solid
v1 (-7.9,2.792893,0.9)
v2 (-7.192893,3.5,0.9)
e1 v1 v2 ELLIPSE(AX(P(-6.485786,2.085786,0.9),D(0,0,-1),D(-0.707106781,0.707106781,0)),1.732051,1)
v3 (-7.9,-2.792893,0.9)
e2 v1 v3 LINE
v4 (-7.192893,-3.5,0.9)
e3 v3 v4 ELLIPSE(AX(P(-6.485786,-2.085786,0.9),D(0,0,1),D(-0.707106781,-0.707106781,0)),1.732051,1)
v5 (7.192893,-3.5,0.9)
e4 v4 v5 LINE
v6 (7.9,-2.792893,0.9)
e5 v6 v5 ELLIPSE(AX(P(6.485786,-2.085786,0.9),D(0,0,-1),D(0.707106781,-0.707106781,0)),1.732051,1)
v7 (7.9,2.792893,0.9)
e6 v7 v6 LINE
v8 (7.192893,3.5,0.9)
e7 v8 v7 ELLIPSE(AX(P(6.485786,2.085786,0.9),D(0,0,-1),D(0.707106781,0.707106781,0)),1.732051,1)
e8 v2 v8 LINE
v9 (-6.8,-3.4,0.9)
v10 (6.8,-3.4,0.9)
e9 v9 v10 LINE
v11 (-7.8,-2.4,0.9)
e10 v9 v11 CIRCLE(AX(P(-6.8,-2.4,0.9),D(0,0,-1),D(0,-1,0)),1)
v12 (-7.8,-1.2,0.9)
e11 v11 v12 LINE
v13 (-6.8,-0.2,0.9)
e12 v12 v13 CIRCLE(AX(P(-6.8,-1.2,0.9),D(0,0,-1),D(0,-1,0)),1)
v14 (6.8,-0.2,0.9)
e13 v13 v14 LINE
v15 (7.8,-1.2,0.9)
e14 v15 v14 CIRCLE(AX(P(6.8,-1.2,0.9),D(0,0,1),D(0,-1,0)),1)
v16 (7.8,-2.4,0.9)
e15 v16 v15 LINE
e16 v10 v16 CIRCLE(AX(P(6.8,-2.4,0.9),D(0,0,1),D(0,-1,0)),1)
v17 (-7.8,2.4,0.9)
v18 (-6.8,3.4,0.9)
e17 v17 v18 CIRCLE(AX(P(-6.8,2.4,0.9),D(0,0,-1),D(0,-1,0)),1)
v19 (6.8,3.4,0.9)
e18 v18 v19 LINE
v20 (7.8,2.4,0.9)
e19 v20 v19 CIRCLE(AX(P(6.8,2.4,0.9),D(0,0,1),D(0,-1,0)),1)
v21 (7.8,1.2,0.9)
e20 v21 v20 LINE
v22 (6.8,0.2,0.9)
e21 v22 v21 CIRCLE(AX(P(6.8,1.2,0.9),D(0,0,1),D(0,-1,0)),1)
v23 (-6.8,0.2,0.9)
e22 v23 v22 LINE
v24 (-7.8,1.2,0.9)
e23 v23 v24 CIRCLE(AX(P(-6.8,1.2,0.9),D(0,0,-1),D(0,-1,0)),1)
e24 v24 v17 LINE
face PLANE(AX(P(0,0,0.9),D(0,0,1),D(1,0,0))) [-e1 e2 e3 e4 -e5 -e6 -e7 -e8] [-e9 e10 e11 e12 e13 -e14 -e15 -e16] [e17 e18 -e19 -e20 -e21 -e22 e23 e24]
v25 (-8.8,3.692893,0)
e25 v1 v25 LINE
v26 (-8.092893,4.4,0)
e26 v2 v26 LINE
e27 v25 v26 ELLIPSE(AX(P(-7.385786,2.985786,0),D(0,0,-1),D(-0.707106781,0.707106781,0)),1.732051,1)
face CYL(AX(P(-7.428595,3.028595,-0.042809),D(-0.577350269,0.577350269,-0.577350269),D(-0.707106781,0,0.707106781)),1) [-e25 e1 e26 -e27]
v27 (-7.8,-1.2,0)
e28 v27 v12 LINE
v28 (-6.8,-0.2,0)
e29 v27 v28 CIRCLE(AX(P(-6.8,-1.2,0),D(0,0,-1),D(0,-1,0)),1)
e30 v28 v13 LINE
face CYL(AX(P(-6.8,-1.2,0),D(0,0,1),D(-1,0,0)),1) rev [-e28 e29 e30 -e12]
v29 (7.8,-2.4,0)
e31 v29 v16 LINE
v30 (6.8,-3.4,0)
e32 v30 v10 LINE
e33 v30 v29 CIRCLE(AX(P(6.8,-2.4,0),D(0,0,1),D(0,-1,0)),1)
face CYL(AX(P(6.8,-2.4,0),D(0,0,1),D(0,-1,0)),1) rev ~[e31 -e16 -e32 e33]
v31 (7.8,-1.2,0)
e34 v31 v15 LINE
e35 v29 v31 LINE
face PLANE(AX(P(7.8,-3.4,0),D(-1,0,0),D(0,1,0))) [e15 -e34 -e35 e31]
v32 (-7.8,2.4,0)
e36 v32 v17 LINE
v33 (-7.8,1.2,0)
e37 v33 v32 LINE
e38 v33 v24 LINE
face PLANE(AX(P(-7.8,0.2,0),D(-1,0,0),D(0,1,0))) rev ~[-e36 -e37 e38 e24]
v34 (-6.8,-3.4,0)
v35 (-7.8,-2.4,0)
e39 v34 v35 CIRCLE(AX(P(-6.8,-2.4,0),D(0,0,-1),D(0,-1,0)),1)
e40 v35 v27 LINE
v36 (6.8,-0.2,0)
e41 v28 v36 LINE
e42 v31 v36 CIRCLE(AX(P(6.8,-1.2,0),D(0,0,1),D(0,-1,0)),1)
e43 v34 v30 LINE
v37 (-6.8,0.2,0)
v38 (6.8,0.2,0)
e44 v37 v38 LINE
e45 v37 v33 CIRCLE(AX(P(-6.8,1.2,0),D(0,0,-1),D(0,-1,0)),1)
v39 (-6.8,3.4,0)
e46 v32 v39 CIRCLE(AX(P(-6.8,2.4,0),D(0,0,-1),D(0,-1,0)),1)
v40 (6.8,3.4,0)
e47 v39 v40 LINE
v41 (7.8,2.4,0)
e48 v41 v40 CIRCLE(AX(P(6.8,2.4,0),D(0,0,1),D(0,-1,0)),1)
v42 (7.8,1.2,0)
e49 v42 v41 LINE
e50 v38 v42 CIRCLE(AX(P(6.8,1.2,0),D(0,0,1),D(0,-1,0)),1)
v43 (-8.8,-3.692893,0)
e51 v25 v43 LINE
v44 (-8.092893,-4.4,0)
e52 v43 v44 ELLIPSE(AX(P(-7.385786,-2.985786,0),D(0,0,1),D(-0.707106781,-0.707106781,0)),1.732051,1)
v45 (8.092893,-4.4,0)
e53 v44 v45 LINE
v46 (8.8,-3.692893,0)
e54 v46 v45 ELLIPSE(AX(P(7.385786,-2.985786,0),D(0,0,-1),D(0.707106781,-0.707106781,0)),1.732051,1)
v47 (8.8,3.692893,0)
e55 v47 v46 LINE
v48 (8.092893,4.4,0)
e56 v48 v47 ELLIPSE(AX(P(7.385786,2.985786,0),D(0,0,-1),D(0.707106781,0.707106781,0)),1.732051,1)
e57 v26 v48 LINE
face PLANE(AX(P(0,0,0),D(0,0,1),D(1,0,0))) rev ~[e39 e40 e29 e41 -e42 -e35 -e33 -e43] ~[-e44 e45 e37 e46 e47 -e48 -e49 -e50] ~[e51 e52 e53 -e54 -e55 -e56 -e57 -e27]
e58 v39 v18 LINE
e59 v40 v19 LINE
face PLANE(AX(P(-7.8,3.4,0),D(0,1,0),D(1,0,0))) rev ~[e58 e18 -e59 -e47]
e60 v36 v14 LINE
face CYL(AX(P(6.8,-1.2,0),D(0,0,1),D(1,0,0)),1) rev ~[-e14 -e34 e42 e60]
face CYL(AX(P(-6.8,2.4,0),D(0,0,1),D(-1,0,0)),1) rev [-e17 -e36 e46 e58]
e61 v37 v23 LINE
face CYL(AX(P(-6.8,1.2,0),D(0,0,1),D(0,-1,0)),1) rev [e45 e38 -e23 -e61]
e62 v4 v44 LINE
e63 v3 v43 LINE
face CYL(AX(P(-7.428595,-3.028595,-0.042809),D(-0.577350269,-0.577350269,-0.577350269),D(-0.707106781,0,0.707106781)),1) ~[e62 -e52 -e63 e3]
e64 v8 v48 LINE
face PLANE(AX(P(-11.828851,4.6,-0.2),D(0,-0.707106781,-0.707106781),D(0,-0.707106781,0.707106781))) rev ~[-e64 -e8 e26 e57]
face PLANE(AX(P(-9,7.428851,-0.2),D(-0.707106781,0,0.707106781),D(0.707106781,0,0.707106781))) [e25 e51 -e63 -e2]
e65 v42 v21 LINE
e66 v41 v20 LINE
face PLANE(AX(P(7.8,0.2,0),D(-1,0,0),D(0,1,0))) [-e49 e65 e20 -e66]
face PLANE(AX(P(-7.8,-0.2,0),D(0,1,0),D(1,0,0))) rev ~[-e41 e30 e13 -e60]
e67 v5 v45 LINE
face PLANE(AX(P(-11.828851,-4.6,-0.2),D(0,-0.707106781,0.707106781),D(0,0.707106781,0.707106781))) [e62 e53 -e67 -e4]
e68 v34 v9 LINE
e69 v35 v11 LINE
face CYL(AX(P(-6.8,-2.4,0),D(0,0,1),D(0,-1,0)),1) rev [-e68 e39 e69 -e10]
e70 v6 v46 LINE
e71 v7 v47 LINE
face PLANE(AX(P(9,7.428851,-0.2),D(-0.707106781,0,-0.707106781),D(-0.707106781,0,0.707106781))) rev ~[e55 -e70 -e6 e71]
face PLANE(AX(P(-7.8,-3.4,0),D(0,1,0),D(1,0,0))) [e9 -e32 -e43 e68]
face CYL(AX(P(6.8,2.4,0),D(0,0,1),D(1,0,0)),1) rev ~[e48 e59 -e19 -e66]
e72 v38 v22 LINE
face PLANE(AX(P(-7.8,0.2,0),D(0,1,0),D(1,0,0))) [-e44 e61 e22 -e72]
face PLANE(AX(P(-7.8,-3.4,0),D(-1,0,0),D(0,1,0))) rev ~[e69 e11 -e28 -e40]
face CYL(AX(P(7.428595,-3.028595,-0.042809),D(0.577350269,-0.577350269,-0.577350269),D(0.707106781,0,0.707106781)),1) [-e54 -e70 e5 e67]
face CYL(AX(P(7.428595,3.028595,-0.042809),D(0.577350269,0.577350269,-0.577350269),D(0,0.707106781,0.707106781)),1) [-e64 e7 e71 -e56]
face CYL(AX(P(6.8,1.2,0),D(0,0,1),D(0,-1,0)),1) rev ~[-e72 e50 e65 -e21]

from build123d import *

# Parameters (mm, degrees)
F0_W        = 18
F0_H        = 9.2
F0_W_2      = 15.6
F0_H_2      = 3.2
F1_DEPTH    = 0.9
F2_T1_DEPTH = 23.6577025735
F2_T3_DEPTH = 14.8577025735
F3_R        = 1


# Not quite as in the source:
# - a fillet or chamfer that OpenCascade refuses, or shapes differently, is made with other operations: its cross-section is extruded or revolved along the edge and cut away or added


with BuildPart() as f1:
    # F0 (on Top) → F1 (new body)
    with BuildSketch(Plane.XY):
        Rectangle(F0_W, F0_H)
        with Locations((0, -1.8)):
            Rectangle(F0_W_2, F0_H_2, mode=Mode.SUBTRACT)
        with Locations((0, 1.8)):
            Rectangle(F0_W_2, F0_H_2, mode=Mode.SUBTRACT)
    extrude(amount=F1_DEPTH)

    # F2: chamfer of 1.1 on 4 edges, made by hand

    # F2_s2 → F2_t1 (cut)
    with BuildSketch(Plane.YZ.offset(-11.8288512868)):
        Polygon((-4.6, -0.2), (-3.5, 0.9), (-4.6, 0.9), align=None)
        Polygon((4.6, -0.2), (3.5, 0.9), (4.6, 0.9), align=None)
    extrude(amount=F2_T1_DEPTH, mode=Mode.SUBTRACT)

    # F2_s4 → F2_t3 (cut)
    with BuildSketch(Plane.XZ.offset(-7.4288512868)):
        Polygon((-9, -0.2), (-7.9, 0.9), (-9, 0.9), align=None)
        Polygon((9, -0.2), (7.9, 0.9), (9, 0.9), align=None)
    extrude(amount=F2_T3_DEPTH, mode=Mode.SUBTRACT)

    # F3
    f3_edges = [f1.edges().sort_by_distance(p)[0] for p in [
        (-7.8, 3.4, 0.45),
        (-7.8, -0.2, 0.45),
        (7.8, 0.2, 0.45),
        (7.8, -3.4, 0.45),
        (7.8, 3.4, 0.45),
        (7.8, -0.2, 0.45),
        (-7.8, 0.2, 0.45),
        (-7.8, -3.4, 0.45),
        (-8.35, -3.95, 0.45),
        (8.35, -3.95, 0.45),
        (8.35, 3.95, 0.45),
        (-8.35, 3.95, 0.45),
    ]]
    fillet(f3_edges, radius=F3_R)


solid = f1.part
